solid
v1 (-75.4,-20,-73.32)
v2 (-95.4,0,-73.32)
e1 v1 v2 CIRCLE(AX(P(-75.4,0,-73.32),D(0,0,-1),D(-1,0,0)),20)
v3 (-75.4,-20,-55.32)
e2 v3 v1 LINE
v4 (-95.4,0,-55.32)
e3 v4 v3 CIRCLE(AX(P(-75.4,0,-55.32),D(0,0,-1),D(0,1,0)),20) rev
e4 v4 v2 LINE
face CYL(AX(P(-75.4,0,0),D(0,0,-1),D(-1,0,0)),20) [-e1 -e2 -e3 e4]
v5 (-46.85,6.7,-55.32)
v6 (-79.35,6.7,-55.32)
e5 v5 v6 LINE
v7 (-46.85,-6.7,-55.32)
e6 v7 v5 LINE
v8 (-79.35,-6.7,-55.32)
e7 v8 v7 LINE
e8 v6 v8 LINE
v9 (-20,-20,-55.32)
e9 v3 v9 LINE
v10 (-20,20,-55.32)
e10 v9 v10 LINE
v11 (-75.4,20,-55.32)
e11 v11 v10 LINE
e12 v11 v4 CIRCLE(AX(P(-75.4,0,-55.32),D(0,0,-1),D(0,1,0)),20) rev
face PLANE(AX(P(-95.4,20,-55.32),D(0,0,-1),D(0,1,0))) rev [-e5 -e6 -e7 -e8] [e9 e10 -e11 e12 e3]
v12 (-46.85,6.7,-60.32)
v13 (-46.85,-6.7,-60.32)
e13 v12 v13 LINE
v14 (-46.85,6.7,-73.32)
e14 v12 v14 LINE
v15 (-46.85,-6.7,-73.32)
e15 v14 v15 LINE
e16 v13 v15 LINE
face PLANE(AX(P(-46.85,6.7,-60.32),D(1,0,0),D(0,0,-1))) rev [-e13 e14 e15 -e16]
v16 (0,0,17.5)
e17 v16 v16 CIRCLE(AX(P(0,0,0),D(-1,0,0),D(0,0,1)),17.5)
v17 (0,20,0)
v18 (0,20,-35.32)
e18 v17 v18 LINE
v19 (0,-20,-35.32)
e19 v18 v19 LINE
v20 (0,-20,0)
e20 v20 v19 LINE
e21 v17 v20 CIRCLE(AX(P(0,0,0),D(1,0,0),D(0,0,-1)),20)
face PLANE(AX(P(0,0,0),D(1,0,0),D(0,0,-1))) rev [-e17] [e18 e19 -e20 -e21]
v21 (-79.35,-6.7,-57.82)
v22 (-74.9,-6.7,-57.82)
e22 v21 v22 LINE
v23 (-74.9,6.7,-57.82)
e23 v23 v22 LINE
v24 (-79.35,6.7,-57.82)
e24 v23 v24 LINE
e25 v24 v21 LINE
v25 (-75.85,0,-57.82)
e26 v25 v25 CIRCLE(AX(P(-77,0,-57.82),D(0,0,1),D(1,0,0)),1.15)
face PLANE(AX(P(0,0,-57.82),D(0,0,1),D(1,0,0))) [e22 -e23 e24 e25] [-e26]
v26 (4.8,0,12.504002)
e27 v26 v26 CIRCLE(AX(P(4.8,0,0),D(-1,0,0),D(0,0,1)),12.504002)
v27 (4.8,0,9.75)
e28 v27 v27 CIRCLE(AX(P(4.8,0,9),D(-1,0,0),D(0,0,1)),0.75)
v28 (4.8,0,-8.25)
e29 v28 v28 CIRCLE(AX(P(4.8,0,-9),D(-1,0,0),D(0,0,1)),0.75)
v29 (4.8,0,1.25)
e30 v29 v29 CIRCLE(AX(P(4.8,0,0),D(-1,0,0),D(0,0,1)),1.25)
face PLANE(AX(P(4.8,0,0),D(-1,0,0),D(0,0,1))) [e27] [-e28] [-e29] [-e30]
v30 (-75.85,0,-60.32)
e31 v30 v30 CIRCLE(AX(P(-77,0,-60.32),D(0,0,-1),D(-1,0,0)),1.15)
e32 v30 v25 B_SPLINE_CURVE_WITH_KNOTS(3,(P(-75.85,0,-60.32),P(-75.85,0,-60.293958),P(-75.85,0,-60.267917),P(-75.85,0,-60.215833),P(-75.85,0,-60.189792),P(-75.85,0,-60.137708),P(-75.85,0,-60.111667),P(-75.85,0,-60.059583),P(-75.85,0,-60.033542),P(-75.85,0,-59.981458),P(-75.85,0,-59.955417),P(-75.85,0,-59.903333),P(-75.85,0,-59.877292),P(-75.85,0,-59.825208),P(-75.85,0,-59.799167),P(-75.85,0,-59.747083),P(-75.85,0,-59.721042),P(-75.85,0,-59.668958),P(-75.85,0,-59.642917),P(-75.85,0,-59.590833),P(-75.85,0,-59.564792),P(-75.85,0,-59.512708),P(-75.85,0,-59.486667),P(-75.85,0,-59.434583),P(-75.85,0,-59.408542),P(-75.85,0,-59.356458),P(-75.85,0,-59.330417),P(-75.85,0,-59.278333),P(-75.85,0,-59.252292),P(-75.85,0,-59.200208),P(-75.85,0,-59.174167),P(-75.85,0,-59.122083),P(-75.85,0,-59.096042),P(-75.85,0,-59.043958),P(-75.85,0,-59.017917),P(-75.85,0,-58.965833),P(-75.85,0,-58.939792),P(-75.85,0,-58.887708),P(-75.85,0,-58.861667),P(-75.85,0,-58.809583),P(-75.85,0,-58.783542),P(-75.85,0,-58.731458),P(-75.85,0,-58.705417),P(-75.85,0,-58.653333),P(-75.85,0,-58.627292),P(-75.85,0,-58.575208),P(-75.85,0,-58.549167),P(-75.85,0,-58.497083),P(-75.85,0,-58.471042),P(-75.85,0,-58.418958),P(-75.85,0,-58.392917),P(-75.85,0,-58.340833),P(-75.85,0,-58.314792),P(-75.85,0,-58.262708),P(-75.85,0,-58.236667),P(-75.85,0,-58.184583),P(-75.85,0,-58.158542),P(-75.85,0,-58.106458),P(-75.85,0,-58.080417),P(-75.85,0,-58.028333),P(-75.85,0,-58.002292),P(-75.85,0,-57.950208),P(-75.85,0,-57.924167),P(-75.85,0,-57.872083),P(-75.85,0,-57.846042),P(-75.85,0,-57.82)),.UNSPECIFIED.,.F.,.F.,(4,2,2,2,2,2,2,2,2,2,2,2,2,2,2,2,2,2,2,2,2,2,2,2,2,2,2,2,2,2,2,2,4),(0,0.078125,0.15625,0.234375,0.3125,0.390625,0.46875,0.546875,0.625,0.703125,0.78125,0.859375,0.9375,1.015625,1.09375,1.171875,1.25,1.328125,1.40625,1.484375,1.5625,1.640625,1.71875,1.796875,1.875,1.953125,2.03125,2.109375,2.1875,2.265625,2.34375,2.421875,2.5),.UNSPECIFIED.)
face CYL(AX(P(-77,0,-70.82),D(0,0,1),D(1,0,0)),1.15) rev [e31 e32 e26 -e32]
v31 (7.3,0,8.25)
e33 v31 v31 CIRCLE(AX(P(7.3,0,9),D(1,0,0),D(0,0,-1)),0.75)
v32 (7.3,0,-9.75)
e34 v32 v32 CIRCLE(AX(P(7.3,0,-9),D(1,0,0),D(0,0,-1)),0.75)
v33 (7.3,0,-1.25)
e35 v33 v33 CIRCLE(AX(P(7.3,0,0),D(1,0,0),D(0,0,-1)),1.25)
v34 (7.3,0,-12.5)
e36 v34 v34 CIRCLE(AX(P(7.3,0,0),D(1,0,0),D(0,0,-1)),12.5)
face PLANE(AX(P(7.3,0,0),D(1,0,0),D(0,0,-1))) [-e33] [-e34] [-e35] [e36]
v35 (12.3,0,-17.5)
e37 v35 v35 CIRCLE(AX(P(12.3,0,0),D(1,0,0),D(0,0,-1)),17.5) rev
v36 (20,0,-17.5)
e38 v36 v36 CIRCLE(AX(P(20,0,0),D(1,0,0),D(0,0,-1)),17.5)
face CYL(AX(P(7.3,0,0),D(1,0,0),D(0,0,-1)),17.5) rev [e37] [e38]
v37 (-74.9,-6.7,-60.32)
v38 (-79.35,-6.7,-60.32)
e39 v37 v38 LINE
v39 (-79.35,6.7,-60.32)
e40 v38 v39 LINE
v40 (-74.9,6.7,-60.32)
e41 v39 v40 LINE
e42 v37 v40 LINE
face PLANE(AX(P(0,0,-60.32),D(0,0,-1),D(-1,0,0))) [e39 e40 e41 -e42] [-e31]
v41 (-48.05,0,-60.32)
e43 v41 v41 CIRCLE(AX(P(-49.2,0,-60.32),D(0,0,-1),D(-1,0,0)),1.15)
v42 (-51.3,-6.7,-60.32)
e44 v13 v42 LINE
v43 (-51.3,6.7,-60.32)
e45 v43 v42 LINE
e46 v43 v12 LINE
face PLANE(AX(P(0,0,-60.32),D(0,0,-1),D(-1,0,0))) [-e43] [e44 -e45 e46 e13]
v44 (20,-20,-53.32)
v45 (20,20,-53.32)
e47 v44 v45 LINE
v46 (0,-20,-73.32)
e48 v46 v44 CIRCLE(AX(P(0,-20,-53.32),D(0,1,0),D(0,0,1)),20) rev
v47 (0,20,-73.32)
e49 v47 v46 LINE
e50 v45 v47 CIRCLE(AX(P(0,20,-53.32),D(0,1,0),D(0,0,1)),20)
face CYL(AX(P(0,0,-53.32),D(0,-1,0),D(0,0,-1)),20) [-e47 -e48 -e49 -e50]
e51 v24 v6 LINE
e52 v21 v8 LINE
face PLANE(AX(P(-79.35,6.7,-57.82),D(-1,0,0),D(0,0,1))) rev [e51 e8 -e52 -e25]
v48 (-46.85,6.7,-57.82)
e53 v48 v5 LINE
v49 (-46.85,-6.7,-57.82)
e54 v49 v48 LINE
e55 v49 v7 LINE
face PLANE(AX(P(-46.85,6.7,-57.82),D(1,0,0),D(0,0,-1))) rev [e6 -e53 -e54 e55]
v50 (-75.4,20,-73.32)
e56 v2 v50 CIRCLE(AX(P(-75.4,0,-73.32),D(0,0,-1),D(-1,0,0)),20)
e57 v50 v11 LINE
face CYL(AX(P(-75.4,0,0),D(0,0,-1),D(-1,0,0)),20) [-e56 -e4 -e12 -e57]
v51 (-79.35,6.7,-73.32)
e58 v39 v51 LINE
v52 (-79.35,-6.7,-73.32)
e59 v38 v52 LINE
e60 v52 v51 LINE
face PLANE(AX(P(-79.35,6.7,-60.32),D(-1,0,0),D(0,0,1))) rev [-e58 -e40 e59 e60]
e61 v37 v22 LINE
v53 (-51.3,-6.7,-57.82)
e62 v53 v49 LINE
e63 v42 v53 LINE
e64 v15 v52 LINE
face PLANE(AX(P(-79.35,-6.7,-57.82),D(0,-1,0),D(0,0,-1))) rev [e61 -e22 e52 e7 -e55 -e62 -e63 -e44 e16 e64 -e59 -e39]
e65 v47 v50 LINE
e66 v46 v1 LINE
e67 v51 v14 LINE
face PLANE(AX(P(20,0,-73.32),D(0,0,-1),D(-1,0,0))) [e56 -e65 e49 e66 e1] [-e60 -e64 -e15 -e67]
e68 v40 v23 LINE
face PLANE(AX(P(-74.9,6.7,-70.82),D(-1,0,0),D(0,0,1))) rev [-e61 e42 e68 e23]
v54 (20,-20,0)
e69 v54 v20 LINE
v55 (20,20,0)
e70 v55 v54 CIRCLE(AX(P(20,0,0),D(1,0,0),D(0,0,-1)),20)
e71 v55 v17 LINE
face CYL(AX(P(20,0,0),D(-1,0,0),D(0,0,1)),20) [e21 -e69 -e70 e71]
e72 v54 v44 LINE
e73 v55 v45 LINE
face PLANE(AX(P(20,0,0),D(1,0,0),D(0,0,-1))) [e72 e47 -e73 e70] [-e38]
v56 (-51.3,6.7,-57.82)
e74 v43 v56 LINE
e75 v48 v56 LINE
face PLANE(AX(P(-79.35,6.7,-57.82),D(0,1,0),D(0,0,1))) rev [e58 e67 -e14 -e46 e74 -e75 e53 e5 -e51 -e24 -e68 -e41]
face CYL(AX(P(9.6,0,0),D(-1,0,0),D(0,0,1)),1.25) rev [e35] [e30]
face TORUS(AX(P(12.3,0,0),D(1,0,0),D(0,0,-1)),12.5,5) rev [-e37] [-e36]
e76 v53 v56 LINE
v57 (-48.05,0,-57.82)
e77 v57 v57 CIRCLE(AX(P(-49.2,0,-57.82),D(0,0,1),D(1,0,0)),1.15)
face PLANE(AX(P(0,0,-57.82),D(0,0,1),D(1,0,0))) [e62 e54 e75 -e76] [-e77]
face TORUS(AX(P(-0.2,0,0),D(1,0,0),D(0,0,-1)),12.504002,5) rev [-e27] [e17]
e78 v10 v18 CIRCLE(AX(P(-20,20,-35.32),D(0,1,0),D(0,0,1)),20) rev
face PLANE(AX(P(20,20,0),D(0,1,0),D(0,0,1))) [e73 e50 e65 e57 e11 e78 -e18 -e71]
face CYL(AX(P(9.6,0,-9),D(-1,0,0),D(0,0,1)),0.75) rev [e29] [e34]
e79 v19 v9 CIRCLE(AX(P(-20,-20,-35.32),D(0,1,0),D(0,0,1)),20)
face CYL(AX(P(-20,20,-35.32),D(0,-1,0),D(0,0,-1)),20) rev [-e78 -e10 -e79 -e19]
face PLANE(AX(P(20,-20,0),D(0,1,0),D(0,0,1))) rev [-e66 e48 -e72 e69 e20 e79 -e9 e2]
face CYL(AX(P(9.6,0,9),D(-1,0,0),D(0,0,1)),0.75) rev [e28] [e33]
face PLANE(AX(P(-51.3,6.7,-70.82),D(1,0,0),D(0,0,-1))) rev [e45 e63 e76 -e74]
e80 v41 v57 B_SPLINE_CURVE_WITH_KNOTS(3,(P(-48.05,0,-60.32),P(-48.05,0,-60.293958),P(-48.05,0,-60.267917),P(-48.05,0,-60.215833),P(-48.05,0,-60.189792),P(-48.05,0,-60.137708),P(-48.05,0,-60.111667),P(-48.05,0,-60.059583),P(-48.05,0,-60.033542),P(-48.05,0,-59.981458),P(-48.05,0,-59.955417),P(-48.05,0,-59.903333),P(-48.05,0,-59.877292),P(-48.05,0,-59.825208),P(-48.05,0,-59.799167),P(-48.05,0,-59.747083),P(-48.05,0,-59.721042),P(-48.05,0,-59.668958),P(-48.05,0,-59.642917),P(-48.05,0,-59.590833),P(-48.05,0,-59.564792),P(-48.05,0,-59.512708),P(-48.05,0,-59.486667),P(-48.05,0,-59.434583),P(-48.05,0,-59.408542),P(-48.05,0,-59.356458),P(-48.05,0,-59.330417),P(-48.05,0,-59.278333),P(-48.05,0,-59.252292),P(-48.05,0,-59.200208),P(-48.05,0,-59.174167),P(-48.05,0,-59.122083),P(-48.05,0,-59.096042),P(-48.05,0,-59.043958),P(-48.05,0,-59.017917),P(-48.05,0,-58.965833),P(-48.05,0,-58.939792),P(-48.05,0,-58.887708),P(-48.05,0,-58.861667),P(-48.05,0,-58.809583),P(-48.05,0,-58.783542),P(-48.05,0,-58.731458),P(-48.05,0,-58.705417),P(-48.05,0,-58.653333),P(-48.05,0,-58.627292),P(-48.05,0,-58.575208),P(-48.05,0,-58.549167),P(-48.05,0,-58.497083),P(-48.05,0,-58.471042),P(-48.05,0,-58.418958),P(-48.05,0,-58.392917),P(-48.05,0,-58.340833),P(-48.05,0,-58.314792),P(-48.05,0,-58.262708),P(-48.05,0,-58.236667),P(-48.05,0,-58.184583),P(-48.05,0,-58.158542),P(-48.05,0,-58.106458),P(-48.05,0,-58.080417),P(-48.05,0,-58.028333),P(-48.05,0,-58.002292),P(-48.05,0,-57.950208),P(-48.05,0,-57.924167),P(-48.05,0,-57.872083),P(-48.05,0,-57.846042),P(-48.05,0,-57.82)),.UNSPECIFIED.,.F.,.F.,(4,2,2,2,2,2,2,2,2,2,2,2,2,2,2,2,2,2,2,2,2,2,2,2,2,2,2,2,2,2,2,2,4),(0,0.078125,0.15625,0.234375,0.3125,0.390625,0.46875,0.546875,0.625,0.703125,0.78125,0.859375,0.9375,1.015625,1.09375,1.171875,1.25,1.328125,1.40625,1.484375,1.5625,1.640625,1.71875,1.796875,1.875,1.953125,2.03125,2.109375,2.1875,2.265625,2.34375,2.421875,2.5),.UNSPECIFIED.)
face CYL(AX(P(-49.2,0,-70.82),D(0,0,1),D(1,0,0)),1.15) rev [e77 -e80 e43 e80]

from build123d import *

# Parameters (mm, degrees)
BOSS_EXTRUDE1_DEPTH = 20
SKETCH2_R           = 17.5
CUT_EXTRUDE1_DEPTH  = 12.7
CUT_EXTRUDE2_START  = -4.8
SKETCH3_R           = 17.5
CUT_EXTRUDE2_DEPTH  = 4.8
SKETCH4_R           = 1.25
SKETCH4_R_2         = 0.75
CUT_EXTRUDE3_DEPTH  = 4.8
SKETCH5_W           = 18
SKETCH5_H           = 40
BOSS_EXTRUDE2_DEPTH = 95.4
FILLET1_R           = 20
SKETCH7_W           = 32.5
SKETCH7_H           = 13.4
CUT_EXTRUDE4_DEPTH  = 2.5
FILLET2_R           = 5
FILLET3_R           = 20
SKETCH8_W           = 32.5
SKETCH8_H           = 13.4
CUT_EXTRUDE5_DEPTH  = 13
SKETCH9_R           = 1.15
SKETCH9_W           = 23.6
SKETCH9_H           = 13.4
CUT_EXTRUDE6_DEPTH  = 13


# Some blends are built 0.0001 mm under size
with BuildPart() as part:
    # Sketch1 → Boss-Extrude1 (new body)
    with BuildSketch(Plane(origin=(0, 0, 0), x_dir=(0, 0, -1), z_dir=(1, 0, 0))):
        with BuildLine():
            Line((73.32, 20), (0, 20))
            ThreePointArc((0, 20), (14.142135624, 14.142135624), (20, 0))
            ThreePointArc((20, 0), (14.142135624, -14.142135624), (0, -20))
            Line((0, -20), (73.32, -20))
            Line((73.32, -20), (73.32, 20))
        make_face()
        with BuildLine():
            ThreePointArc((20, 0), (14.142135624, 14.142135624), (0, 20))
            Line((0, 20), (0, -20))
            ThreePointArc((0, -20), (14.142135624, -14.142135624), (20, 0))
        make_face()
        with BuildLine():
            Line((0, -20), (0, 20))
            ThreePointArc((0, 20), (-20, 0), (0, -20))
        make_face()
    extrude(amount=BOSS_EXTRUDE1_DEPTH)

    # Sketch2 → Cut-Extrude1 (cut)
    with BuildSketch(Plane(origin=(20, 0, 0), x_dir=(0, 0, -1), z_dir=(1, 0, 0))):
        Circle(SKETCH2_R)
    extrude(amount=-CUT_EXTRUDE1_DEPTH, mode=Mode.SUBTRACT)

    # Sketch3 → Cut-Extrude2 (cut)
    with BuildSketch(Plane.ZY.offset(CUT_EXTRUDE2_START)):
        with Locations(Location((0, 0, 0), (0, 0, 180))):
            Circle(SKETCH3_R)
    extrude(amount=CUT_EXTRUDE2_DEPTH, mode=Mode.SUBTRACT)

    # Sketch4 → Cut-Extrude3 (cut)
    with BuildSketch(Plane.ZY.offset(-4.8)):
        Circle(SKETCH4_R)
        with Locations((-9, 0)):
            Circle(SKETCH4_R_2)
        with Locations((9, 0)):
            Circle(SKETCH4_R_2)
    extrude(amount=-CUT_EXTRUDE3_DEPTH, mode=Mode.SUBTRACT)

    # Sketch5 → Boss-Extrude2 (add)
    with BuildSketch(Plane.ZY):
        with Locations((-64.32, 0)):
            Rectangle(SKETCH5_W, SKETCH5_H)
    extrude(amount=BOSS_EXTRUDE2_DEPTH)

    # Fillet1
    fillet1_edges = [part.edges().sort_by_distance(p)[0] for p in [
        (-95.4, -20, -64.32),
        (-95.4, 20, -64.32),
    ]]
    fillet(fillet1_edges, radius=FILLET1_R - 0.0001)  # a hair under: the kernel refuses the full size

    # Sketch7 → Cut-Extrude4 (cut)
    with BuildSketch(Plane.XY.offset(-55.32)):
        with Locations((-63.1, 0)):
            Rectangle(SKETCH7_W, SKETCH7_H)
    extrude(amount=-CUT_EXTRUDE4_DEPTH, mode=Mode.SUBTRACT)

    # Fillet2
    # the kernel refuses this fillet: 5 mm, written as the material it adds along each edge
    with BuildSketch(Plane(origin=(7.3, 0, 0), x_dir=(0, 0, -1), z_dir=(0, -1, 0))) as fillet2_piece_1:
        with BuildLine():
            CenterArc((17.5 - FILLET2_R, FILLET2_R), FILLET2_R, 270, 90)
            Line((17.5 - FILLET2_R, 0), (17.5 - FILLET2_R, -FILLET2_R * 0.02))
            Line((17.5 - FILLET2_R, -FILLET2_R * 0.02), (17.5 + FILLET2_R * 0.02, -FILLET2_R * 0.02))
            Line((17.5 + FILLET2_R * 0.02, -FILLET2_R * 0.02), (17.5 + FILLET2_R * 0.02, FILLET2_R))
            Line((17.5 + FILLET2_R * 0.02, FILLET2_R), (17.5, FILLET2_R))
        make_face()
    revolve(axis=Axis((7.3, 0, 0), (1, 0, 0)))
    with BuildSketch(Plane(origin=(4.8, 0, 0), x_dir=(0, 0, -1), z_dir=(0, 1, 0))) as fillet2_piece_2:
        with BuildLine():
            CenterArc((12.504001601, 5), FILLET2_R, 270, 87.707557224)
            Line((12.504001601, 0), (12.504001601, -0.1))
            Line((12.504001601, -0.1), (17.5, -0.1))
            Line((17.5, -0.1), (17.6, 0))
            ThreePointArc((17.6, 0), (17.6, 2.4), (17.599919968, 4.796))
            Line((17.599919968, 4.796), (17.5, 4.8))
        make_face()
    revolve(axis=Axis((4.8, 0, 0), (-1, 0, 0)))

    # Fillet3
    fillet3_edges = [part.edges().sort_by_distance(p)[0] for p in [
        (20, 0, -73.32),
        (0, 0, -55.32),
    ]]
    fillet(fillet3_edges, radius=FILLET3_R)

    # Sketch8 → Cut-Extrude5 (cut)
    with BuildSketch(Plane(origin=(0, 0, -73.32), x_dir=(-1, 0, 0), z_dir=(0, 0, -1))):
        with Locations((63.1, 0)):
            Rectangle(SKETCH8_W, SKETCH8_H)
    extrude(amount=-CUT_EXTRUDE5_DEPTH, mode=Mode.SUBTRACT)

    # Sketch9 → Cut-Extrude6 (cut)
    with BuildSketch(Plane.XY.offset(-57.82)):
        with Locations((-77, 0)):
            Circle(SKETCH9_R)
        with Locations((-49.2, 0)):
            Circle(SKETCH9_R)
        with Locations((-63.1, 0)):
            Rectangle(SKETCH9_W, SKETCH9_H)
    extrude(amount=-CUT_EXTRUDE6_DEPTH, mode=Mode.SUBTRACT)


solid = part.part
